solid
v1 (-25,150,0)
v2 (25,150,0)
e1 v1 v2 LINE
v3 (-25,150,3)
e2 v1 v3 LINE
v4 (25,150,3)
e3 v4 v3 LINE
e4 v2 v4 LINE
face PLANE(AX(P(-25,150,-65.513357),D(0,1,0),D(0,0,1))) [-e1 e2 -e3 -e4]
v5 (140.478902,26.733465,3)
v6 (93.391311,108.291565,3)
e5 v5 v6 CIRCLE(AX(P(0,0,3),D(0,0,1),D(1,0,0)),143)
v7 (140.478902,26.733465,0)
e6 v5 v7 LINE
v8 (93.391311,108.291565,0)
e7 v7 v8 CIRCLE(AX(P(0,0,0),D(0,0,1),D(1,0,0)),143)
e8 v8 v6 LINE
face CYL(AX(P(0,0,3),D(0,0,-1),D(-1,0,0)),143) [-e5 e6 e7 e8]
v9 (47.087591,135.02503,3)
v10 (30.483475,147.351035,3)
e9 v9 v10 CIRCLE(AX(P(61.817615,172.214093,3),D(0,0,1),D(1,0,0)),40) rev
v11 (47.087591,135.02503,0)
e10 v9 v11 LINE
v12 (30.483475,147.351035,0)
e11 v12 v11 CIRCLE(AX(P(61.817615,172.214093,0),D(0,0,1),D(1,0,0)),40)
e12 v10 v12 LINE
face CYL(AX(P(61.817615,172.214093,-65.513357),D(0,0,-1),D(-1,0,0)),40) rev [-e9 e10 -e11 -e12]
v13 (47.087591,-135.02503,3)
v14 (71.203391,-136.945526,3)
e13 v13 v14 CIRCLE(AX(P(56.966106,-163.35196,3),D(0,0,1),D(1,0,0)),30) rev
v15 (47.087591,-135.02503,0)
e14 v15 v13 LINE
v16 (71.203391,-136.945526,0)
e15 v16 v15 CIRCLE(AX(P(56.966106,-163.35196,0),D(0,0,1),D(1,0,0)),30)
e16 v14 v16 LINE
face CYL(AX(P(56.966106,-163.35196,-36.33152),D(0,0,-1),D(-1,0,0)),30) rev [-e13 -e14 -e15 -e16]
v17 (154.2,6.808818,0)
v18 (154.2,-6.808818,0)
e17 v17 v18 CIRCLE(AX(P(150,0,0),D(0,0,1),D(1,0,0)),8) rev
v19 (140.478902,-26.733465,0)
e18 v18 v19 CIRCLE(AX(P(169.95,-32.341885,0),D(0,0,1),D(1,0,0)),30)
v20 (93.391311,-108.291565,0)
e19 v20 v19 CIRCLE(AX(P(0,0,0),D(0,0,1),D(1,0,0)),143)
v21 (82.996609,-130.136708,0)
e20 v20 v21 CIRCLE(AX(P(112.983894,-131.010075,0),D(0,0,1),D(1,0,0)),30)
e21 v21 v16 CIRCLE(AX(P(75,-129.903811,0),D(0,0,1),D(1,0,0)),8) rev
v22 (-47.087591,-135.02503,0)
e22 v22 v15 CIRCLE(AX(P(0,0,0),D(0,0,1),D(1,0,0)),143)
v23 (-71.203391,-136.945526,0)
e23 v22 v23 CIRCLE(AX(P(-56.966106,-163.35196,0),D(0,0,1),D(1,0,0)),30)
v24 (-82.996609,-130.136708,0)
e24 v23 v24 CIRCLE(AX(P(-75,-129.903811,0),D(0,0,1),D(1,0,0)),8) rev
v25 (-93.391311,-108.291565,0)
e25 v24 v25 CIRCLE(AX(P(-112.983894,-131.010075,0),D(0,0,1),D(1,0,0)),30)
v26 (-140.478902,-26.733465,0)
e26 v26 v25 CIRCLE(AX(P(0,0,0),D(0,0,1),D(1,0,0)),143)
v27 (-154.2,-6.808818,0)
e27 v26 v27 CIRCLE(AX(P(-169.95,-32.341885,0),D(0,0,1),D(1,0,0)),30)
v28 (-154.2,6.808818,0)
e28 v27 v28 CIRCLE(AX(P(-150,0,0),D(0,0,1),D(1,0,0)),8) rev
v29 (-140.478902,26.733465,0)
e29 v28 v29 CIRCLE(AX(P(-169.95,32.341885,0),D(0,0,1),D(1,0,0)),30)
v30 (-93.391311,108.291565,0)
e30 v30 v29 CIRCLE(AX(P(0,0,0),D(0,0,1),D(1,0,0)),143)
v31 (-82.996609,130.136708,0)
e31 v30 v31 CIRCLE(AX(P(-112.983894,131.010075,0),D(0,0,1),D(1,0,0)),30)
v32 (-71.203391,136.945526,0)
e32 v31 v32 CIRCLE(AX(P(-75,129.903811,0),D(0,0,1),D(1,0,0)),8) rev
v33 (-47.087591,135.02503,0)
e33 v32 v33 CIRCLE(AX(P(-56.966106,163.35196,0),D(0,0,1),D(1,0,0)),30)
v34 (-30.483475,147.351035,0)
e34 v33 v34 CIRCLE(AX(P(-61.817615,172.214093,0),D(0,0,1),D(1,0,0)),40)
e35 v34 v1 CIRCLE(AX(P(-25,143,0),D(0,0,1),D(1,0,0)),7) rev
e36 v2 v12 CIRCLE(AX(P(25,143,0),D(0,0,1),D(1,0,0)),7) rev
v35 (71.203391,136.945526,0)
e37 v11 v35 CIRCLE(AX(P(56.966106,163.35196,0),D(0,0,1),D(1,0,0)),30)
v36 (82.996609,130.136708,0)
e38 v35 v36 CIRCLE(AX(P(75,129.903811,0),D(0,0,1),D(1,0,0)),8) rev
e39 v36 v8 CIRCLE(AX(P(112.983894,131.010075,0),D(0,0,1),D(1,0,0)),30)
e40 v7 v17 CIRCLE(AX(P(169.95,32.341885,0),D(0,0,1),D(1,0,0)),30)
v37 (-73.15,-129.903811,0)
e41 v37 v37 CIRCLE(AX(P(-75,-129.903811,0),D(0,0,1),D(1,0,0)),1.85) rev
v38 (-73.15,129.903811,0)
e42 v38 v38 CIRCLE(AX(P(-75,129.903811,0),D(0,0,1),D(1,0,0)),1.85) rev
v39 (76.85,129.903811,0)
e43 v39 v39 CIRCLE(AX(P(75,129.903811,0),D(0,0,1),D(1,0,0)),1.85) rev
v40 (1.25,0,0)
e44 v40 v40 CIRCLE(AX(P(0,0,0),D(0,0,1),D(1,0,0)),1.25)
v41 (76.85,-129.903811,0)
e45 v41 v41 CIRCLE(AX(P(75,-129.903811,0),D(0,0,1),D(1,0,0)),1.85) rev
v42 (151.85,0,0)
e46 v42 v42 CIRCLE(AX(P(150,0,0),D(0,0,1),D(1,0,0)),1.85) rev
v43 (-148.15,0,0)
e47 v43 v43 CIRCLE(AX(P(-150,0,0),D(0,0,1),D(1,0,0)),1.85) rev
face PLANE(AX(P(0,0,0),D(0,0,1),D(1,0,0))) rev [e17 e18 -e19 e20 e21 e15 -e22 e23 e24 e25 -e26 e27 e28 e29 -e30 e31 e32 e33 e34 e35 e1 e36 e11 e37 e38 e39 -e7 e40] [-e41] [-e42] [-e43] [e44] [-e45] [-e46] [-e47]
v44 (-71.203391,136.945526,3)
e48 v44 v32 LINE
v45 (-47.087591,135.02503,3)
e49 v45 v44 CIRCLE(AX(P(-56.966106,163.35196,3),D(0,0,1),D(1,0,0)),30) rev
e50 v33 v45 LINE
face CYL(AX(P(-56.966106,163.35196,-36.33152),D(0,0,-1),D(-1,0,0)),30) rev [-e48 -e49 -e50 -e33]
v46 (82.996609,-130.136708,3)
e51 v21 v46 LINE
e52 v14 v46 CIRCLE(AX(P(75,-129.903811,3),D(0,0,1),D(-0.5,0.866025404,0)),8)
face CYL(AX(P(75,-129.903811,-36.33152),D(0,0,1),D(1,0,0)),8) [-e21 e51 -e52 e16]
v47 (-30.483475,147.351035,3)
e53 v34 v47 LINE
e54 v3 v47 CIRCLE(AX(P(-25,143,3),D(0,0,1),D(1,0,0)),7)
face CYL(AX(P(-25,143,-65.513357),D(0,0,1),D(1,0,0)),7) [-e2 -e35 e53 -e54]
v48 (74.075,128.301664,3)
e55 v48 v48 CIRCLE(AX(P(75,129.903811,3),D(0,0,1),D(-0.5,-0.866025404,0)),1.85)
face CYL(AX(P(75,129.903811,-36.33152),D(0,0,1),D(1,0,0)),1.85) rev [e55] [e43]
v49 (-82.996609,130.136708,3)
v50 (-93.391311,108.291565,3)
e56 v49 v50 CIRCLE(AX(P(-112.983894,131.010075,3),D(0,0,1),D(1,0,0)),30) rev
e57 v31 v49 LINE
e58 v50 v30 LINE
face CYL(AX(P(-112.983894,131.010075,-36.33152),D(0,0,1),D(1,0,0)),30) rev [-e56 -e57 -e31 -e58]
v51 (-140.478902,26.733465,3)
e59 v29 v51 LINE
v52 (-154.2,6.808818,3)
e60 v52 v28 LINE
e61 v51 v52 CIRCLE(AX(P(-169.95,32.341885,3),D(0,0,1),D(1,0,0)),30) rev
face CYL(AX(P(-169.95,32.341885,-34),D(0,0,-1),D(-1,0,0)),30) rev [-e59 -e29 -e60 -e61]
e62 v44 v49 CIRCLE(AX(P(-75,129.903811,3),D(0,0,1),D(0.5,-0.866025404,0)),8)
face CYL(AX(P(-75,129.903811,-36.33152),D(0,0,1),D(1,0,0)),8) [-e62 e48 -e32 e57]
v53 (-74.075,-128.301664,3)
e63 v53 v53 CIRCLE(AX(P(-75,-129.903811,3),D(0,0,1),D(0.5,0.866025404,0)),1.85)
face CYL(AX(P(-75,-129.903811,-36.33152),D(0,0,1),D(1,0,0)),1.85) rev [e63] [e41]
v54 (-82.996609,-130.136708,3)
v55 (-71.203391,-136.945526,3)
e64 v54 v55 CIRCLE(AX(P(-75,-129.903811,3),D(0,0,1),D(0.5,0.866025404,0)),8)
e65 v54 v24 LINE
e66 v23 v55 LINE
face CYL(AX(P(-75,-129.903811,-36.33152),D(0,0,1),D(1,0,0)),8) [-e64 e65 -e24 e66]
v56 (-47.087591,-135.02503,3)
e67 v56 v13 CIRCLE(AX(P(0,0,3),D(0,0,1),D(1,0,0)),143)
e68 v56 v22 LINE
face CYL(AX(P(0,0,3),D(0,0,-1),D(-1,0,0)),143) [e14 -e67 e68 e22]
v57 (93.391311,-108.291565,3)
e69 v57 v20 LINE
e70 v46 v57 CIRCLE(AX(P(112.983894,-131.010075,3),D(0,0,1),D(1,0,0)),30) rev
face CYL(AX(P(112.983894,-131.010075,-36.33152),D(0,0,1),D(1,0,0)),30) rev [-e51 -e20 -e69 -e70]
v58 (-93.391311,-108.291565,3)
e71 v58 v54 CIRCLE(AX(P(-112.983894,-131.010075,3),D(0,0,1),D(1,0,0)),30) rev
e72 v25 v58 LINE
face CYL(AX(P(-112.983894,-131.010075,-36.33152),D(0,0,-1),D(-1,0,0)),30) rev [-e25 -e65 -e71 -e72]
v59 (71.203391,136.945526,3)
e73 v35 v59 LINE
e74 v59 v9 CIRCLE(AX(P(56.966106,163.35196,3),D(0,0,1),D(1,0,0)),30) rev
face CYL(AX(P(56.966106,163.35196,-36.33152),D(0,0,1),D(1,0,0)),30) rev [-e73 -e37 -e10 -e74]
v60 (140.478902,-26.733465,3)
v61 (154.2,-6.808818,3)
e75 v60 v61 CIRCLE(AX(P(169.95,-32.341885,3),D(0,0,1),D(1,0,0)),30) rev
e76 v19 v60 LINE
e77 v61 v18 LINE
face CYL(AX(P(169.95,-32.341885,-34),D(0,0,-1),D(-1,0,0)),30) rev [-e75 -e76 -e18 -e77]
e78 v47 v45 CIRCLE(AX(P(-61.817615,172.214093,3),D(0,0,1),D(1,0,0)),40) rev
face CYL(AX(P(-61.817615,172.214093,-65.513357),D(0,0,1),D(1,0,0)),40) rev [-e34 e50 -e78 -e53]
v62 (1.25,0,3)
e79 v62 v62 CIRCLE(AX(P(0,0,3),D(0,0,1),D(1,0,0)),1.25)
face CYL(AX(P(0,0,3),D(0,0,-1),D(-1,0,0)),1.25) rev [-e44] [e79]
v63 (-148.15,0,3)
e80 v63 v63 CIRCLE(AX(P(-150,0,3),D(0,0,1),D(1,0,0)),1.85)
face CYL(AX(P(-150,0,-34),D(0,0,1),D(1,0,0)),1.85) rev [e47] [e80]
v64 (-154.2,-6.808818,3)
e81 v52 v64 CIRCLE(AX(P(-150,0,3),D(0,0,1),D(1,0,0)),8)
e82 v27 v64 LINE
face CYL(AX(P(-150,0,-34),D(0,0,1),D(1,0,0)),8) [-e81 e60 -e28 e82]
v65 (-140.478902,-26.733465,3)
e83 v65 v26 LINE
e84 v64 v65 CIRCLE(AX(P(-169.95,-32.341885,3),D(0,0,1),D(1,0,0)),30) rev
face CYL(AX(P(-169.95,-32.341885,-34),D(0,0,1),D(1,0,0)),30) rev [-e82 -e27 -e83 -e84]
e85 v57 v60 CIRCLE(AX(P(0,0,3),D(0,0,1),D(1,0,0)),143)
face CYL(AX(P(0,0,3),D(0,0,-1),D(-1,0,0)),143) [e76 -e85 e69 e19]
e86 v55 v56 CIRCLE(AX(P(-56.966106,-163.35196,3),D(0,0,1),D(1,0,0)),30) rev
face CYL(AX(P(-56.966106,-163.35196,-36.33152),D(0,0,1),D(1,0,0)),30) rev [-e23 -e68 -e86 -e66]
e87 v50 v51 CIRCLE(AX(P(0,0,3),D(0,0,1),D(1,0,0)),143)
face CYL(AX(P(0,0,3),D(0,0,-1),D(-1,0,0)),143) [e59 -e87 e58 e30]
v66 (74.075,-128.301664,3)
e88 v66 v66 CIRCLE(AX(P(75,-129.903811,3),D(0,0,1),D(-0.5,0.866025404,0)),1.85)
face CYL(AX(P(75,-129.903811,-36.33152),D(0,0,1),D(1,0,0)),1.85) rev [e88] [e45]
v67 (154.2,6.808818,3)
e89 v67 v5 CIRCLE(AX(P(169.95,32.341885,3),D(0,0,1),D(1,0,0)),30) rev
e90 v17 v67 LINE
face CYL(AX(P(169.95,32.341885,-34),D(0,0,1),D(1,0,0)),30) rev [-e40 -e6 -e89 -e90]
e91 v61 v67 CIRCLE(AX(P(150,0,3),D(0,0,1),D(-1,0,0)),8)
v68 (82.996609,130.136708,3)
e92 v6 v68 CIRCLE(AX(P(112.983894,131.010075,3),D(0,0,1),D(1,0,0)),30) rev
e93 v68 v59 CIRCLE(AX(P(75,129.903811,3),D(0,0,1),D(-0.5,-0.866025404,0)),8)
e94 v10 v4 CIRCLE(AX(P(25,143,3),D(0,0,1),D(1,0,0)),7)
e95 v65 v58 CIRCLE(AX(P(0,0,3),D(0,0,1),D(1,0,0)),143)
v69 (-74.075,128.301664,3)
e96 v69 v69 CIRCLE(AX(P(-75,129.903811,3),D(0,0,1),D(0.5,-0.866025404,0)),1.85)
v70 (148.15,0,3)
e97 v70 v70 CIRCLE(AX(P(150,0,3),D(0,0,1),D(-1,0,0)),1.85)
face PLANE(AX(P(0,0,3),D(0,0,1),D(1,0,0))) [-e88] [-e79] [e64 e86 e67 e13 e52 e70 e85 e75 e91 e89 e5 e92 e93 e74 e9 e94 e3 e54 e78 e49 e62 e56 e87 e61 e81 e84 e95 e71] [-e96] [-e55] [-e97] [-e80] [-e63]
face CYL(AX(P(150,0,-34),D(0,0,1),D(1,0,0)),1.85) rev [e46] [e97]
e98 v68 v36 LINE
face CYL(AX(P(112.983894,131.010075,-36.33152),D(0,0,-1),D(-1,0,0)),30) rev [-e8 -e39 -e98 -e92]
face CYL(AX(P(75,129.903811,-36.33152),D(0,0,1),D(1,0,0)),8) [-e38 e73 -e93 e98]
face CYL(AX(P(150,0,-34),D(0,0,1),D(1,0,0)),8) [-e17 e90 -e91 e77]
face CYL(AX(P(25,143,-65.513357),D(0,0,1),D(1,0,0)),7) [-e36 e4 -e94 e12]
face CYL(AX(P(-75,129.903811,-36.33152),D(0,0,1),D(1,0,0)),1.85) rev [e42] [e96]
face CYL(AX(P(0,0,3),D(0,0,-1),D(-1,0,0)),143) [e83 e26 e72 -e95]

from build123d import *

# Parameters (mm, degrees)
SKETCH1_R                = 143
SKETCH1_R_2              = 1.25
BOSS_EXTRUDE1_DEPTH      = 3
SKETCH2_R                = 1.85
BOSS_EXTRUDE2_DEPTH      = 3
FILLET1_R                = 30
CIRPATTERN1_COUNT        = 6
FILLET1_OF_CIRPATTERN1_R = 30
BOSS_EXTRUDE4_DEPTH      = 3
FILLET2_R                = 40


with BuildPart() as part:
    # Sketch1 → Boss-Extrude1 (new body)
    with BuildSketch(Plane.XY):
        Circle(SKETCH1_R)
        Circle(SKETCH1_R_2, mode=Mode.SUBTRACT)
    extrude(amount=BOSS_EXTRUDE1_DEPTH)

    # Sketch2 → Boss-Extrude2 (add)
    with BuildSketch(Plane.XY.offset(3)):
        with BuildLine():
            Line((-136, -8), (-150, -8))
            ThreePointArc((-150, -8), (-158, 0), (-150, 8))
            Line((-150, 8), (-136, 8))
            ThreePointArc((-136, 8), (-128, 0), (-136, -8))
        make_face()
        with Locations((-150, 0)):
            Circle(SKETCH2_R, mode=Mode.SUBTRACT)
    boss_extrude2 = extrude(amount=-BOSS_EXTRUDE2_DEPTH)

    # Fillet1
    fillet1_edges = [part.edges().sort_by_distance(p)[0] for p in [
        (-142.776048411, 8, 1.5),
        (-142.776048411, -8, 1.5),
    ]]
    fillet(fillet1_edges, radius=FILLET1_R)

    # CirPattern1: Boss-Extrude2 ×6 about axis
    cirpattern1_axis = Axis((0, 0, 0), (0, 0, 1))
    for i in range(1, CIRPATTERN1_COUNT):
        add(boss_extrude2.rotate(cirpattern1_axis, i * 360 / CIRPATTERN1_COUNT))

    # Fillet1 of CirPattern1
    fillet1_of_cirpattern1_edges = [part.edges().sort_by_distance(p)[0] for p in [
        (-78.316227436, -119.647684976, 1.5),
        (-64.459820975, -127.647684976, 1.5),
        (64.459820975, -127.647684976, 1.5),
        (78.316227436, -119.647684976, 1.5),
        (142.776048411, -8, 1.5),
        (142.776048411, 8, 1.5),
        (78.316227436, 119.647684976, 1.5),
        (64.459820975, 127.647684976, 1.5),
        (-64.459820975, 127.647684976, 1.5),
        (-78.316227436, 119.647684976, 1.5),
    ]]
    fillet(fillet1_of_cirpattern1_edges, radius=FILLET1_OF_CIRPATTERN1_R)

    # Sketch6 → Boss-Extrude4 (add)
    with BuildSketch(Plane.XY.offset(3)):
        with BuildLine():
            Line((-25, 150), (25, 150))
            ThreePointArc((25, 150), (32, 143), (25, 136))
            Line((25, 136), (-25, 136))
            ThreePointArc((-25, 136), (-32, 143), (-25, 150))
        make_face()
    extrude(amount=-BOSS_EXTRUDE4_DEPTH)

    # Fillet2
    # the kernel refuses this fillet: 40 mm, written as the material it adds along each edge
    with BuildSketch(Plane(origin=(31.105412767, 139.575976789, 3), x_dir=(0.9617682057549536, -0.27386478123135344, 0), z_dir=(0, 0, -1))) as fillet2_piece_1:
        with BuildLine():
            CenterArc((20.599589027, -39.801292998), FILLET2_R, 95.71339394, 29.960885515)
            ThreePointArc((-2.727475038, -7.307476939), (-0.251629619, -4.068826545), (0, 0))
            ThreePointArc((0, 0), (8.308747323, -0.241586175), (16.617494645, 0))
        make_face()
    extrude(amount=3)
    with BuildSketch(Plane(origin=(-31.105412767, 139.575976789, 3), x_dir=(-0.9617682057549533, -0.27386478123135494, 0), z_dir=(0, 0, -1))) as fillet2_piece_2:
        with BuildLine():
            CenterArc((20.599589027, 39.801292998), FILLET2_R, 234.325720545, 29.960885515)
            ThreePointArc((-2.727475038, 7.307476939), (-0.251629619, 4.068826545), (0, 0))
            ThreePointArc((0, 0), (8.308747323, 0.241586175), (16.617494645, 0))
        make_face()
    extrude(amount=3)


solid = part.part
